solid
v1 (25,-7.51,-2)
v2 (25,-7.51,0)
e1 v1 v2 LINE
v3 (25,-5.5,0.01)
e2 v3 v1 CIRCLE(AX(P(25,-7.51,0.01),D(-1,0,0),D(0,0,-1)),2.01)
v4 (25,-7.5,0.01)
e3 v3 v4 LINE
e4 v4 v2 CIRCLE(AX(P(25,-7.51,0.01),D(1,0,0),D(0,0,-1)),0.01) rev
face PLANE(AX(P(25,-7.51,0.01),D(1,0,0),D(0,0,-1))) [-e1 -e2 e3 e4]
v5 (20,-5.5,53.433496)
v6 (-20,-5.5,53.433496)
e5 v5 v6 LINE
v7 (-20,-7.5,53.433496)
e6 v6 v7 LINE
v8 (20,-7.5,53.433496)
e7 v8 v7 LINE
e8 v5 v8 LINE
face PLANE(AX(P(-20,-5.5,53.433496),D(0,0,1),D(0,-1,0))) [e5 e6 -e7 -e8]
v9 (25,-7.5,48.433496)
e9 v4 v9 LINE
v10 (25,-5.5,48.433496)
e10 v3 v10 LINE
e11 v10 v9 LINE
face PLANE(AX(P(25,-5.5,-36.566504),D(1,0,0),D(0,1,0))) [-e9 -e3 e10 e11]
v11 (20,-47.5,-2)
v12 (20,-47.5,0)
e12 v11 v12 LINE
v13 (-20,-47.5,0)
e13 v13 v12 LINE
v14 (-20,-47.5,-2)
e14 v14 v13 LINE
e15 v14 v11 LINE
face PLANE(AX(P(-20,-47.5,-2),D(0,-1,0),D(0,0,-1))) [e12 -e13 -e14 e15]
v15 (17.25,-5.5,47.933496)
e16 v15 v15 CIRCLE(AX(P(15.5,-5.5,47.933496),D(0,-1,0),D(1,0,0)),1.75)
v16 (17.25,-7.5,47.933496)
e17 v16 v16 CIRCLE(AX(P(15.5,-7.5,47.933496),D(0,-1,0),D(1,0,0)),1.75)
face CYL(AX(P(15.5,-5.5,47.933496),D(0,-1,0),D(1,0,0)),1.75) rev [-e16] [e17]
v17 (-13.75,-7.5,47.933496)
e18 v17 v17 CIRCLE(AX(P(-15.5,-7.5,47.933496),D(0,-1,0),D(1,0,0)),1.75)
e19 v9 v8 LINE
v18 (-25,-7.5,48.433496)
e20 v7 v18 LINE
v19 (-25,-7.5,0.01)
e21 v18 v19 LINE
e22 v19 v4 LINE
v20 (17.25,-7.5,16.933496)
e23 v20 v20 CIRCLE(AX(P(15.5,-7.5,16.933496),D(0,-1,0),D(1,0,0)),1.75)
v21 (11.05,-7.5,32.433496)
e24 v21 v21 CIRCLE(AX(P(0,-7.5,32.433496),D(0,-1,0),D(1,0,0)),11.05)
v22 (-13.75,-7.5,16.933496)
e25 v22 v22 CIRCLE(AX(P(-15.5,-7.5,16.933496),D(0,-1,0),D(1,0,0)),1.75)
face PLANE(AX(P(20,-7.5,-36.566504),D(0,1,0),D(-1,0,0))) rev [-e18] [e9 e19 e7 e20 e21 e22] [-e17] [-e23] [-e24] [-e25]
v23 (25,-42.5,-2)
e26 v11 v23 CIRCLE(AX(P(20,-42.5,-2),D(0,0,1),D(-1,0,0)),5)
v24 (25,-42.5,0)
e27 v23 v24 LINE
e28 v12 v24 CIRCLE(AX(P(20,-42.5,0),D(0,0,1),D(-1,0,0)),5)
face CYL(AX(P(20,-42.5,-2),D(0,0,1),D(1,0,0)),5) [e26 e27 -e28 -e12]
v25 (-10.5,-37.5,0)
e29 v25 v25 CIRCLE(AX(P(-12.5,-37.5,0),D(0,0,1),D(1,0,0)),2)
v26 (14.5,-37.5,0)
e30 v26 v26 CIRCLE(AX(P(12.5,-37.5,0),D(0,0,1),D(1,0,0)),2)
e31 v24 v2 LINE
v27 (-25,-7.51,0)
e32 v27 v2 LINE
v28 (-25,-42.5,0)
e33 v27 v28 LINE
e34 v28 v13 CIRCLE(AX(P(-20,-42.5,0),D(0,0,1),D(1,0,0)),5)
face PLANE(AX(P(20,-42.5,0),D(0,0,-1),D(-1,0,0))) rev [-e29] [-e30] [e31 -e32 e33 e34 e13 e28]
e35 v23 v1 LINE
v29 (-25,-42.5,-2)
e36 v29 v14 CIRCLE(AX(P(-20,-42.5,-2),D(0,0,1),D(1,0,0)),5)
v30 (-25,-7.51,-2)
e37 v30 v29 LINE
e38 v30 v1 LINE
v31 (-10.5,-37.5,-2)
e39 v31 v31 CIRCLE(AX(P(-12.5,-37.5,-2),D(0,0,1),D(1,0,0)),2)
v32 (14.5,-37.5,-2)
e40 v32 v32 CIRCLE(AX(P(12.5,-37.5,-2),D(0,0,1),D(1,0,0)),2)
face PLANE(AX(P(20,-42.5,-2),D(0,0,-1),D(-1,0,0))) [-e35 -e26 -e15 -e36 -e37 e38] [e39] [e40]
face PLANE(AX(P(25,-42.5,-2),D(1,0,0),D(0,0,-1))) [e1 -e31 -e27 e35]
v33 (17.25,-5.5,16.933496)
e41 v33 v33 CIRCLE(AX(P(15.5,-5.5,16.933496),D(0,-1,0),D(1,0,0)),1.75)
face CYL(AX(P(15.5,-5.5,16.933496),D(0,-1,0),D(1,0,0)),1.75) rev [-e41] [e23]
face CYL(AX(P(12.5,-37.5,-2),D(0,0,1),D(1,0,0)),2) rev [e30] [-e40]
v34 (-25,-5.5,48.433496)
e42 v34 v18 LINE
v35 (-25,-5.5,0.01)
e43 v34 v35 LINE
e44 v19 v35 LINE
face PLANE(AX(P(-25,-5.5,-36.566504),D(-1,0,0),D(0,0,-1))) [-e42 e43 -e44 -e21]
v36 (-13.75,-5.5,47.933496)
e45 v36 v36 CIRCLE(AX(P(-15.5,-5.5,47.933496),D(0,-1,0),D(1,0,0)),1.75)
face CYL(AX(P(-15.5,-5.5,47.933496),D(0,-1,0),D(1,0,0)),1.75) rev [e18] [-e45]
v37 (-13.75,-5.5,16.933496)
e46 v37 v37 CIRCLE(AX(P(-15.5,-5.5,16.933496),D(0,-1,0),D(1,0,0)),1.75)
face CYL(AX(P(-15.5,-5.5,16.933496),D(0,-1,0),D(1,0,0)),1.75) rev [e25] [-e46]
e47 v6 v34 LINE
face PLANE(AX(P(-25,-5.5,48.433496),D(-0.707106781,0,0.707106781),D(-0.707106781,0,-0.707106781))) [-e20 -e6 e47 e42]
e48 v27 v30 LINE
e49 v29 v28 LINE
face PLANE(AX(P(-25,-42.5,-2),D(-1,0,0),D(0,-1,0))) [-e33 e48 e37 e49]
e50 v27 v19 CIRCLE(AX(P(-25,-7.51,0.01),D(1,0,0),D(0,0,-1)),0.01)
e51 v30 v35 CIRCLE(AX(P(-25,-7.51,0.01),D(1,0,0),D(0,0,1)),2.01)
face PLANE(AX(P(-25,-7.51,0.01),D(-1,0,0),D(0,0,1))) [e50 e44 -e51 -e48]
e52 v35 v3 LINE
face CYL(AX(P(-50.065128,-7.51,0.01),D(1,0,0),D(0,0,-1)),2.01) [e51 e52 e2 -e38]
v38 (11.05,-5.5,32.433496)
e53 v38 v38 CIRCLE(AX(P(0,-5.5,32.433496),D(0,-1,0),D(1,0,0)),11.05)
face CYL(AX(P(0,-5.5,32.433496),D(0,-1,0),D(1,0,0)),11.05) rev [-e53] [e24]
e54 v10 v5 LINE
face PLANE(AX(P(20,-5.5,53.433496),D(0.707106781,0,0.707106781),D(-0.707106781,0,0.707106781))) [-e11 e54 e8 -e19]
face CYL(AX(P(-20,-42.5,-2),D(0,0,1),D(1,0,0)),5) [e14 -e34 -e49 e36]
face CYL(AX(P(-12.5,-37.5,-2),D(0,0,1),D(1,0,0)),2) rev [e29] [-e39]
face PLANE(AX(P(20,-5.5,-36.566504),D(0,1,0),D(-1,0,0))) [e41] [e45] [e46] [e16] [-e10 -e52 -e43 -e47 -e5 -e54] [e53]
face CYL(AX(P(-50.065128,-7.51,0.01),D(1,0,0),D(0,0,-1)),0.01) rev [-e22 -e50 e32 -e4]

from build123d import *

# Parameters (mm, degrees)
SCHIZZO1_R                             = 1.75
SCHIZZO1_R_2                           = 11.05
SCHIZZO1_R_3                           = 2
BASE_FLANGIA1_DEPTH                    = 2
PIEGATURA_START                        = -5.5
PIEGATURA_DELLO_SCHIZZO1_OUTLINE_W     = 50
PIEGATURA_DELLO_SCHIZZO1_OUTLINE_H     = 2
PIEGATURA_DELLO_SCHIZZO1_DEPTH         = 53
PIEGATURA_START_2                      = -7.5
PIEGATURA_DELLO_SCHIZZO1_2_OUTLINE_R   = 1.75
PIEGATURA_DELLO_SCHIZZO1_2_OUTLINE_R_2 = 11.05
PIEGATURA_DELLO_SCHIZZO1_2_DEPTH       = 2
PIEGATURA_START_3                      = -26
PIEGATURA_DELLO_SCHIZZO1_3_DEPTH       = 52
PIEGATURA_START_4                      = -25
PIEGATURA_DELLO_SCHIZZO1_4_DEPTH       = 50


with BuildPart() as part:
    # Base-Flangia1: sheet metal written as solids
    # Schizzo1 → Base-Flangia1 (new body)
    with BuildSketch(Plane.XY):
        with BuildLine():
            Line((-25, 42.5), (-20, 47.5))
            Line((-20, 47.5), (20, 47.5))
            Line((20, 47.5), (25, 42.5))
            Line((25, 42.5), (25, -42.5))
            ThreePointArc((25, -42.5), (23.535533906, -46.035533906), (20, -47.5))
            Line((20, -47.5), (-20, -47.5))
            ThreePointArc((-20, -47.5), (-23.535533906, -46.035533906), (-25, -42.5))
            Line((-25, -42.5), (-25, 42.5))
        make_face()
        with Locations((-15.5, 42)):
            Circle(SCHIZZO1_R, mode=Mode.SUBTRACT)
        with Locations((15.5, 42)):
            Circle(SCHIZZO1_R, mode=Mode.SUBTRACT)
        with Locations((15.5, 11)):
            Circle(SCHIZZO1_R, mode=Mode.SUBTRACT)
        with Locations((-15.5, 11)):
            Circle(SCHIZZO1_R, mode=Mode.SUBTRACT)
        with Locations((0, 26.5)):
            Circle(SCHIZZO1_R_2, mode=Mode.SUBTRACT)
        with Locations((-12.5, -37.5)):
            Circle(SCHIZZO1_R_3, mode=Mode.SUBTRACT)
        with Locations((12.5, -37.5)):
            Circle(SCHIZZO1_R_3, mode=Mode.SUBTRACT)
    extrude(amount=-BASE_FLANGIA1_DEPTH)

    # Piegatura dello schizzo1: read off the stored shape, not the designer's step
    # Piegatura dello schizzo1 outline → Piegatura dello schizzo1 (cut)
    with BuildSketch(Plane(origin=(0, 0, 0), x_dir=(1, 0, 0), z_dir=(0, 1, 0)).offset(PIEGATURA_START)):
        with Locations((0, 1)):
            Rectangle(PIEGATURA_DELLO_SCHIZZO1_OUTLINE_W, PIEGATURA_DELLO_SCHIZZO1_OUTLINE_H)
    extrude(amount=PIEGATURA_DELLO_SCHIZZO1_DEPTH, mode=Mode.SUBTRACT)

    # Piegatura dello schizzo1 2 outline → Piegatura dello schizzo1 2 (add)
    with BuildSketch(Plane(origin=(0, 0, 0), x_dir=(1, 0, 0), z_dir=(0, 1, 0)).offset(PIEGATURA_START_2)):
        Polygon((-25, 0), (-25, -48.43349571), (-20, -53.43349571), (20, -53.43349571), (25, -48.43349571), (25, 0), align=None)
        with Locations((-15.5, -47.93349571)):
            Circle(PIEGATURA_DELLO_SCHIZZO1_2_OUTLINE_R, mode=Mode.SUBTRACT)
        with Locations((15.5, -47.93349571)):
            Circle(PIEGATURA_DELLO_SCHIZZO1_2_OUTLINE_R, mode=Mode.SUBTRACT)
        with Locations((0, -32.43349571)):
            Circle(PIEGATURA_DELLO_SCHIZZO1_2_OUTLINE_R_2, mode=Mode.SUBTRACT)
        with Locations((-15.5, -16.93349571)):
            Circle(PIEGATURA_DELLO_SCHIZZO1_2_OUTLINE_R, mode=Mode.SUBTRACT)
        with Locations((15.5, -16.93349571)):
            Circle(PIEGATURA_DELLO_SCHIZZO1_2_OUTLINE_R, mode=Mode.SUBTRACT)
    extrude(amount=PIEGATURA_DELLO_SCHIZZO1_2_DEPTH)

    # Piegatura dello schizzo1 3 outline → Piegatura dello schizzo1 3 (cut)
    with BuildSketch(Plane.YZ.offset(PIEGATURA_START_3)):
        with BuildLine():
            ThreePointArc((-5.5, 0.01), (-6.08871537, -1.41128463), (-7.51, -2))
            Line((-7.51, -2), (-5.5, -2))
            Line((-5.5, -2), (-5.5, 0.01))
        make_face()
    extrude(amount=PIEGATURA_DELLO_SCHIZZO1_3_DEPTH, mode=Mode.SUBTRACT)

    # Piegatura dello schizzo1 4 outline → Piegatura dello schizzo1 4 (add)
    with BuildSketch(Plane.YZ.offset(PIEGATURA_START_4)):
        with BuildLine():
            ThreePointArc((-7.5, 0.01), (-7.502928932, 0.002928932), (-7.51, 0))
            Line((-7.51, 0), (-7.5, 0))
            Line((-7.5, 0), (-7.5, 0.01))
        make_face()
    extrude(amount=PIEGATURA_DELLO_SCHIZZO1_4_DEPTH)


solid = part.part
